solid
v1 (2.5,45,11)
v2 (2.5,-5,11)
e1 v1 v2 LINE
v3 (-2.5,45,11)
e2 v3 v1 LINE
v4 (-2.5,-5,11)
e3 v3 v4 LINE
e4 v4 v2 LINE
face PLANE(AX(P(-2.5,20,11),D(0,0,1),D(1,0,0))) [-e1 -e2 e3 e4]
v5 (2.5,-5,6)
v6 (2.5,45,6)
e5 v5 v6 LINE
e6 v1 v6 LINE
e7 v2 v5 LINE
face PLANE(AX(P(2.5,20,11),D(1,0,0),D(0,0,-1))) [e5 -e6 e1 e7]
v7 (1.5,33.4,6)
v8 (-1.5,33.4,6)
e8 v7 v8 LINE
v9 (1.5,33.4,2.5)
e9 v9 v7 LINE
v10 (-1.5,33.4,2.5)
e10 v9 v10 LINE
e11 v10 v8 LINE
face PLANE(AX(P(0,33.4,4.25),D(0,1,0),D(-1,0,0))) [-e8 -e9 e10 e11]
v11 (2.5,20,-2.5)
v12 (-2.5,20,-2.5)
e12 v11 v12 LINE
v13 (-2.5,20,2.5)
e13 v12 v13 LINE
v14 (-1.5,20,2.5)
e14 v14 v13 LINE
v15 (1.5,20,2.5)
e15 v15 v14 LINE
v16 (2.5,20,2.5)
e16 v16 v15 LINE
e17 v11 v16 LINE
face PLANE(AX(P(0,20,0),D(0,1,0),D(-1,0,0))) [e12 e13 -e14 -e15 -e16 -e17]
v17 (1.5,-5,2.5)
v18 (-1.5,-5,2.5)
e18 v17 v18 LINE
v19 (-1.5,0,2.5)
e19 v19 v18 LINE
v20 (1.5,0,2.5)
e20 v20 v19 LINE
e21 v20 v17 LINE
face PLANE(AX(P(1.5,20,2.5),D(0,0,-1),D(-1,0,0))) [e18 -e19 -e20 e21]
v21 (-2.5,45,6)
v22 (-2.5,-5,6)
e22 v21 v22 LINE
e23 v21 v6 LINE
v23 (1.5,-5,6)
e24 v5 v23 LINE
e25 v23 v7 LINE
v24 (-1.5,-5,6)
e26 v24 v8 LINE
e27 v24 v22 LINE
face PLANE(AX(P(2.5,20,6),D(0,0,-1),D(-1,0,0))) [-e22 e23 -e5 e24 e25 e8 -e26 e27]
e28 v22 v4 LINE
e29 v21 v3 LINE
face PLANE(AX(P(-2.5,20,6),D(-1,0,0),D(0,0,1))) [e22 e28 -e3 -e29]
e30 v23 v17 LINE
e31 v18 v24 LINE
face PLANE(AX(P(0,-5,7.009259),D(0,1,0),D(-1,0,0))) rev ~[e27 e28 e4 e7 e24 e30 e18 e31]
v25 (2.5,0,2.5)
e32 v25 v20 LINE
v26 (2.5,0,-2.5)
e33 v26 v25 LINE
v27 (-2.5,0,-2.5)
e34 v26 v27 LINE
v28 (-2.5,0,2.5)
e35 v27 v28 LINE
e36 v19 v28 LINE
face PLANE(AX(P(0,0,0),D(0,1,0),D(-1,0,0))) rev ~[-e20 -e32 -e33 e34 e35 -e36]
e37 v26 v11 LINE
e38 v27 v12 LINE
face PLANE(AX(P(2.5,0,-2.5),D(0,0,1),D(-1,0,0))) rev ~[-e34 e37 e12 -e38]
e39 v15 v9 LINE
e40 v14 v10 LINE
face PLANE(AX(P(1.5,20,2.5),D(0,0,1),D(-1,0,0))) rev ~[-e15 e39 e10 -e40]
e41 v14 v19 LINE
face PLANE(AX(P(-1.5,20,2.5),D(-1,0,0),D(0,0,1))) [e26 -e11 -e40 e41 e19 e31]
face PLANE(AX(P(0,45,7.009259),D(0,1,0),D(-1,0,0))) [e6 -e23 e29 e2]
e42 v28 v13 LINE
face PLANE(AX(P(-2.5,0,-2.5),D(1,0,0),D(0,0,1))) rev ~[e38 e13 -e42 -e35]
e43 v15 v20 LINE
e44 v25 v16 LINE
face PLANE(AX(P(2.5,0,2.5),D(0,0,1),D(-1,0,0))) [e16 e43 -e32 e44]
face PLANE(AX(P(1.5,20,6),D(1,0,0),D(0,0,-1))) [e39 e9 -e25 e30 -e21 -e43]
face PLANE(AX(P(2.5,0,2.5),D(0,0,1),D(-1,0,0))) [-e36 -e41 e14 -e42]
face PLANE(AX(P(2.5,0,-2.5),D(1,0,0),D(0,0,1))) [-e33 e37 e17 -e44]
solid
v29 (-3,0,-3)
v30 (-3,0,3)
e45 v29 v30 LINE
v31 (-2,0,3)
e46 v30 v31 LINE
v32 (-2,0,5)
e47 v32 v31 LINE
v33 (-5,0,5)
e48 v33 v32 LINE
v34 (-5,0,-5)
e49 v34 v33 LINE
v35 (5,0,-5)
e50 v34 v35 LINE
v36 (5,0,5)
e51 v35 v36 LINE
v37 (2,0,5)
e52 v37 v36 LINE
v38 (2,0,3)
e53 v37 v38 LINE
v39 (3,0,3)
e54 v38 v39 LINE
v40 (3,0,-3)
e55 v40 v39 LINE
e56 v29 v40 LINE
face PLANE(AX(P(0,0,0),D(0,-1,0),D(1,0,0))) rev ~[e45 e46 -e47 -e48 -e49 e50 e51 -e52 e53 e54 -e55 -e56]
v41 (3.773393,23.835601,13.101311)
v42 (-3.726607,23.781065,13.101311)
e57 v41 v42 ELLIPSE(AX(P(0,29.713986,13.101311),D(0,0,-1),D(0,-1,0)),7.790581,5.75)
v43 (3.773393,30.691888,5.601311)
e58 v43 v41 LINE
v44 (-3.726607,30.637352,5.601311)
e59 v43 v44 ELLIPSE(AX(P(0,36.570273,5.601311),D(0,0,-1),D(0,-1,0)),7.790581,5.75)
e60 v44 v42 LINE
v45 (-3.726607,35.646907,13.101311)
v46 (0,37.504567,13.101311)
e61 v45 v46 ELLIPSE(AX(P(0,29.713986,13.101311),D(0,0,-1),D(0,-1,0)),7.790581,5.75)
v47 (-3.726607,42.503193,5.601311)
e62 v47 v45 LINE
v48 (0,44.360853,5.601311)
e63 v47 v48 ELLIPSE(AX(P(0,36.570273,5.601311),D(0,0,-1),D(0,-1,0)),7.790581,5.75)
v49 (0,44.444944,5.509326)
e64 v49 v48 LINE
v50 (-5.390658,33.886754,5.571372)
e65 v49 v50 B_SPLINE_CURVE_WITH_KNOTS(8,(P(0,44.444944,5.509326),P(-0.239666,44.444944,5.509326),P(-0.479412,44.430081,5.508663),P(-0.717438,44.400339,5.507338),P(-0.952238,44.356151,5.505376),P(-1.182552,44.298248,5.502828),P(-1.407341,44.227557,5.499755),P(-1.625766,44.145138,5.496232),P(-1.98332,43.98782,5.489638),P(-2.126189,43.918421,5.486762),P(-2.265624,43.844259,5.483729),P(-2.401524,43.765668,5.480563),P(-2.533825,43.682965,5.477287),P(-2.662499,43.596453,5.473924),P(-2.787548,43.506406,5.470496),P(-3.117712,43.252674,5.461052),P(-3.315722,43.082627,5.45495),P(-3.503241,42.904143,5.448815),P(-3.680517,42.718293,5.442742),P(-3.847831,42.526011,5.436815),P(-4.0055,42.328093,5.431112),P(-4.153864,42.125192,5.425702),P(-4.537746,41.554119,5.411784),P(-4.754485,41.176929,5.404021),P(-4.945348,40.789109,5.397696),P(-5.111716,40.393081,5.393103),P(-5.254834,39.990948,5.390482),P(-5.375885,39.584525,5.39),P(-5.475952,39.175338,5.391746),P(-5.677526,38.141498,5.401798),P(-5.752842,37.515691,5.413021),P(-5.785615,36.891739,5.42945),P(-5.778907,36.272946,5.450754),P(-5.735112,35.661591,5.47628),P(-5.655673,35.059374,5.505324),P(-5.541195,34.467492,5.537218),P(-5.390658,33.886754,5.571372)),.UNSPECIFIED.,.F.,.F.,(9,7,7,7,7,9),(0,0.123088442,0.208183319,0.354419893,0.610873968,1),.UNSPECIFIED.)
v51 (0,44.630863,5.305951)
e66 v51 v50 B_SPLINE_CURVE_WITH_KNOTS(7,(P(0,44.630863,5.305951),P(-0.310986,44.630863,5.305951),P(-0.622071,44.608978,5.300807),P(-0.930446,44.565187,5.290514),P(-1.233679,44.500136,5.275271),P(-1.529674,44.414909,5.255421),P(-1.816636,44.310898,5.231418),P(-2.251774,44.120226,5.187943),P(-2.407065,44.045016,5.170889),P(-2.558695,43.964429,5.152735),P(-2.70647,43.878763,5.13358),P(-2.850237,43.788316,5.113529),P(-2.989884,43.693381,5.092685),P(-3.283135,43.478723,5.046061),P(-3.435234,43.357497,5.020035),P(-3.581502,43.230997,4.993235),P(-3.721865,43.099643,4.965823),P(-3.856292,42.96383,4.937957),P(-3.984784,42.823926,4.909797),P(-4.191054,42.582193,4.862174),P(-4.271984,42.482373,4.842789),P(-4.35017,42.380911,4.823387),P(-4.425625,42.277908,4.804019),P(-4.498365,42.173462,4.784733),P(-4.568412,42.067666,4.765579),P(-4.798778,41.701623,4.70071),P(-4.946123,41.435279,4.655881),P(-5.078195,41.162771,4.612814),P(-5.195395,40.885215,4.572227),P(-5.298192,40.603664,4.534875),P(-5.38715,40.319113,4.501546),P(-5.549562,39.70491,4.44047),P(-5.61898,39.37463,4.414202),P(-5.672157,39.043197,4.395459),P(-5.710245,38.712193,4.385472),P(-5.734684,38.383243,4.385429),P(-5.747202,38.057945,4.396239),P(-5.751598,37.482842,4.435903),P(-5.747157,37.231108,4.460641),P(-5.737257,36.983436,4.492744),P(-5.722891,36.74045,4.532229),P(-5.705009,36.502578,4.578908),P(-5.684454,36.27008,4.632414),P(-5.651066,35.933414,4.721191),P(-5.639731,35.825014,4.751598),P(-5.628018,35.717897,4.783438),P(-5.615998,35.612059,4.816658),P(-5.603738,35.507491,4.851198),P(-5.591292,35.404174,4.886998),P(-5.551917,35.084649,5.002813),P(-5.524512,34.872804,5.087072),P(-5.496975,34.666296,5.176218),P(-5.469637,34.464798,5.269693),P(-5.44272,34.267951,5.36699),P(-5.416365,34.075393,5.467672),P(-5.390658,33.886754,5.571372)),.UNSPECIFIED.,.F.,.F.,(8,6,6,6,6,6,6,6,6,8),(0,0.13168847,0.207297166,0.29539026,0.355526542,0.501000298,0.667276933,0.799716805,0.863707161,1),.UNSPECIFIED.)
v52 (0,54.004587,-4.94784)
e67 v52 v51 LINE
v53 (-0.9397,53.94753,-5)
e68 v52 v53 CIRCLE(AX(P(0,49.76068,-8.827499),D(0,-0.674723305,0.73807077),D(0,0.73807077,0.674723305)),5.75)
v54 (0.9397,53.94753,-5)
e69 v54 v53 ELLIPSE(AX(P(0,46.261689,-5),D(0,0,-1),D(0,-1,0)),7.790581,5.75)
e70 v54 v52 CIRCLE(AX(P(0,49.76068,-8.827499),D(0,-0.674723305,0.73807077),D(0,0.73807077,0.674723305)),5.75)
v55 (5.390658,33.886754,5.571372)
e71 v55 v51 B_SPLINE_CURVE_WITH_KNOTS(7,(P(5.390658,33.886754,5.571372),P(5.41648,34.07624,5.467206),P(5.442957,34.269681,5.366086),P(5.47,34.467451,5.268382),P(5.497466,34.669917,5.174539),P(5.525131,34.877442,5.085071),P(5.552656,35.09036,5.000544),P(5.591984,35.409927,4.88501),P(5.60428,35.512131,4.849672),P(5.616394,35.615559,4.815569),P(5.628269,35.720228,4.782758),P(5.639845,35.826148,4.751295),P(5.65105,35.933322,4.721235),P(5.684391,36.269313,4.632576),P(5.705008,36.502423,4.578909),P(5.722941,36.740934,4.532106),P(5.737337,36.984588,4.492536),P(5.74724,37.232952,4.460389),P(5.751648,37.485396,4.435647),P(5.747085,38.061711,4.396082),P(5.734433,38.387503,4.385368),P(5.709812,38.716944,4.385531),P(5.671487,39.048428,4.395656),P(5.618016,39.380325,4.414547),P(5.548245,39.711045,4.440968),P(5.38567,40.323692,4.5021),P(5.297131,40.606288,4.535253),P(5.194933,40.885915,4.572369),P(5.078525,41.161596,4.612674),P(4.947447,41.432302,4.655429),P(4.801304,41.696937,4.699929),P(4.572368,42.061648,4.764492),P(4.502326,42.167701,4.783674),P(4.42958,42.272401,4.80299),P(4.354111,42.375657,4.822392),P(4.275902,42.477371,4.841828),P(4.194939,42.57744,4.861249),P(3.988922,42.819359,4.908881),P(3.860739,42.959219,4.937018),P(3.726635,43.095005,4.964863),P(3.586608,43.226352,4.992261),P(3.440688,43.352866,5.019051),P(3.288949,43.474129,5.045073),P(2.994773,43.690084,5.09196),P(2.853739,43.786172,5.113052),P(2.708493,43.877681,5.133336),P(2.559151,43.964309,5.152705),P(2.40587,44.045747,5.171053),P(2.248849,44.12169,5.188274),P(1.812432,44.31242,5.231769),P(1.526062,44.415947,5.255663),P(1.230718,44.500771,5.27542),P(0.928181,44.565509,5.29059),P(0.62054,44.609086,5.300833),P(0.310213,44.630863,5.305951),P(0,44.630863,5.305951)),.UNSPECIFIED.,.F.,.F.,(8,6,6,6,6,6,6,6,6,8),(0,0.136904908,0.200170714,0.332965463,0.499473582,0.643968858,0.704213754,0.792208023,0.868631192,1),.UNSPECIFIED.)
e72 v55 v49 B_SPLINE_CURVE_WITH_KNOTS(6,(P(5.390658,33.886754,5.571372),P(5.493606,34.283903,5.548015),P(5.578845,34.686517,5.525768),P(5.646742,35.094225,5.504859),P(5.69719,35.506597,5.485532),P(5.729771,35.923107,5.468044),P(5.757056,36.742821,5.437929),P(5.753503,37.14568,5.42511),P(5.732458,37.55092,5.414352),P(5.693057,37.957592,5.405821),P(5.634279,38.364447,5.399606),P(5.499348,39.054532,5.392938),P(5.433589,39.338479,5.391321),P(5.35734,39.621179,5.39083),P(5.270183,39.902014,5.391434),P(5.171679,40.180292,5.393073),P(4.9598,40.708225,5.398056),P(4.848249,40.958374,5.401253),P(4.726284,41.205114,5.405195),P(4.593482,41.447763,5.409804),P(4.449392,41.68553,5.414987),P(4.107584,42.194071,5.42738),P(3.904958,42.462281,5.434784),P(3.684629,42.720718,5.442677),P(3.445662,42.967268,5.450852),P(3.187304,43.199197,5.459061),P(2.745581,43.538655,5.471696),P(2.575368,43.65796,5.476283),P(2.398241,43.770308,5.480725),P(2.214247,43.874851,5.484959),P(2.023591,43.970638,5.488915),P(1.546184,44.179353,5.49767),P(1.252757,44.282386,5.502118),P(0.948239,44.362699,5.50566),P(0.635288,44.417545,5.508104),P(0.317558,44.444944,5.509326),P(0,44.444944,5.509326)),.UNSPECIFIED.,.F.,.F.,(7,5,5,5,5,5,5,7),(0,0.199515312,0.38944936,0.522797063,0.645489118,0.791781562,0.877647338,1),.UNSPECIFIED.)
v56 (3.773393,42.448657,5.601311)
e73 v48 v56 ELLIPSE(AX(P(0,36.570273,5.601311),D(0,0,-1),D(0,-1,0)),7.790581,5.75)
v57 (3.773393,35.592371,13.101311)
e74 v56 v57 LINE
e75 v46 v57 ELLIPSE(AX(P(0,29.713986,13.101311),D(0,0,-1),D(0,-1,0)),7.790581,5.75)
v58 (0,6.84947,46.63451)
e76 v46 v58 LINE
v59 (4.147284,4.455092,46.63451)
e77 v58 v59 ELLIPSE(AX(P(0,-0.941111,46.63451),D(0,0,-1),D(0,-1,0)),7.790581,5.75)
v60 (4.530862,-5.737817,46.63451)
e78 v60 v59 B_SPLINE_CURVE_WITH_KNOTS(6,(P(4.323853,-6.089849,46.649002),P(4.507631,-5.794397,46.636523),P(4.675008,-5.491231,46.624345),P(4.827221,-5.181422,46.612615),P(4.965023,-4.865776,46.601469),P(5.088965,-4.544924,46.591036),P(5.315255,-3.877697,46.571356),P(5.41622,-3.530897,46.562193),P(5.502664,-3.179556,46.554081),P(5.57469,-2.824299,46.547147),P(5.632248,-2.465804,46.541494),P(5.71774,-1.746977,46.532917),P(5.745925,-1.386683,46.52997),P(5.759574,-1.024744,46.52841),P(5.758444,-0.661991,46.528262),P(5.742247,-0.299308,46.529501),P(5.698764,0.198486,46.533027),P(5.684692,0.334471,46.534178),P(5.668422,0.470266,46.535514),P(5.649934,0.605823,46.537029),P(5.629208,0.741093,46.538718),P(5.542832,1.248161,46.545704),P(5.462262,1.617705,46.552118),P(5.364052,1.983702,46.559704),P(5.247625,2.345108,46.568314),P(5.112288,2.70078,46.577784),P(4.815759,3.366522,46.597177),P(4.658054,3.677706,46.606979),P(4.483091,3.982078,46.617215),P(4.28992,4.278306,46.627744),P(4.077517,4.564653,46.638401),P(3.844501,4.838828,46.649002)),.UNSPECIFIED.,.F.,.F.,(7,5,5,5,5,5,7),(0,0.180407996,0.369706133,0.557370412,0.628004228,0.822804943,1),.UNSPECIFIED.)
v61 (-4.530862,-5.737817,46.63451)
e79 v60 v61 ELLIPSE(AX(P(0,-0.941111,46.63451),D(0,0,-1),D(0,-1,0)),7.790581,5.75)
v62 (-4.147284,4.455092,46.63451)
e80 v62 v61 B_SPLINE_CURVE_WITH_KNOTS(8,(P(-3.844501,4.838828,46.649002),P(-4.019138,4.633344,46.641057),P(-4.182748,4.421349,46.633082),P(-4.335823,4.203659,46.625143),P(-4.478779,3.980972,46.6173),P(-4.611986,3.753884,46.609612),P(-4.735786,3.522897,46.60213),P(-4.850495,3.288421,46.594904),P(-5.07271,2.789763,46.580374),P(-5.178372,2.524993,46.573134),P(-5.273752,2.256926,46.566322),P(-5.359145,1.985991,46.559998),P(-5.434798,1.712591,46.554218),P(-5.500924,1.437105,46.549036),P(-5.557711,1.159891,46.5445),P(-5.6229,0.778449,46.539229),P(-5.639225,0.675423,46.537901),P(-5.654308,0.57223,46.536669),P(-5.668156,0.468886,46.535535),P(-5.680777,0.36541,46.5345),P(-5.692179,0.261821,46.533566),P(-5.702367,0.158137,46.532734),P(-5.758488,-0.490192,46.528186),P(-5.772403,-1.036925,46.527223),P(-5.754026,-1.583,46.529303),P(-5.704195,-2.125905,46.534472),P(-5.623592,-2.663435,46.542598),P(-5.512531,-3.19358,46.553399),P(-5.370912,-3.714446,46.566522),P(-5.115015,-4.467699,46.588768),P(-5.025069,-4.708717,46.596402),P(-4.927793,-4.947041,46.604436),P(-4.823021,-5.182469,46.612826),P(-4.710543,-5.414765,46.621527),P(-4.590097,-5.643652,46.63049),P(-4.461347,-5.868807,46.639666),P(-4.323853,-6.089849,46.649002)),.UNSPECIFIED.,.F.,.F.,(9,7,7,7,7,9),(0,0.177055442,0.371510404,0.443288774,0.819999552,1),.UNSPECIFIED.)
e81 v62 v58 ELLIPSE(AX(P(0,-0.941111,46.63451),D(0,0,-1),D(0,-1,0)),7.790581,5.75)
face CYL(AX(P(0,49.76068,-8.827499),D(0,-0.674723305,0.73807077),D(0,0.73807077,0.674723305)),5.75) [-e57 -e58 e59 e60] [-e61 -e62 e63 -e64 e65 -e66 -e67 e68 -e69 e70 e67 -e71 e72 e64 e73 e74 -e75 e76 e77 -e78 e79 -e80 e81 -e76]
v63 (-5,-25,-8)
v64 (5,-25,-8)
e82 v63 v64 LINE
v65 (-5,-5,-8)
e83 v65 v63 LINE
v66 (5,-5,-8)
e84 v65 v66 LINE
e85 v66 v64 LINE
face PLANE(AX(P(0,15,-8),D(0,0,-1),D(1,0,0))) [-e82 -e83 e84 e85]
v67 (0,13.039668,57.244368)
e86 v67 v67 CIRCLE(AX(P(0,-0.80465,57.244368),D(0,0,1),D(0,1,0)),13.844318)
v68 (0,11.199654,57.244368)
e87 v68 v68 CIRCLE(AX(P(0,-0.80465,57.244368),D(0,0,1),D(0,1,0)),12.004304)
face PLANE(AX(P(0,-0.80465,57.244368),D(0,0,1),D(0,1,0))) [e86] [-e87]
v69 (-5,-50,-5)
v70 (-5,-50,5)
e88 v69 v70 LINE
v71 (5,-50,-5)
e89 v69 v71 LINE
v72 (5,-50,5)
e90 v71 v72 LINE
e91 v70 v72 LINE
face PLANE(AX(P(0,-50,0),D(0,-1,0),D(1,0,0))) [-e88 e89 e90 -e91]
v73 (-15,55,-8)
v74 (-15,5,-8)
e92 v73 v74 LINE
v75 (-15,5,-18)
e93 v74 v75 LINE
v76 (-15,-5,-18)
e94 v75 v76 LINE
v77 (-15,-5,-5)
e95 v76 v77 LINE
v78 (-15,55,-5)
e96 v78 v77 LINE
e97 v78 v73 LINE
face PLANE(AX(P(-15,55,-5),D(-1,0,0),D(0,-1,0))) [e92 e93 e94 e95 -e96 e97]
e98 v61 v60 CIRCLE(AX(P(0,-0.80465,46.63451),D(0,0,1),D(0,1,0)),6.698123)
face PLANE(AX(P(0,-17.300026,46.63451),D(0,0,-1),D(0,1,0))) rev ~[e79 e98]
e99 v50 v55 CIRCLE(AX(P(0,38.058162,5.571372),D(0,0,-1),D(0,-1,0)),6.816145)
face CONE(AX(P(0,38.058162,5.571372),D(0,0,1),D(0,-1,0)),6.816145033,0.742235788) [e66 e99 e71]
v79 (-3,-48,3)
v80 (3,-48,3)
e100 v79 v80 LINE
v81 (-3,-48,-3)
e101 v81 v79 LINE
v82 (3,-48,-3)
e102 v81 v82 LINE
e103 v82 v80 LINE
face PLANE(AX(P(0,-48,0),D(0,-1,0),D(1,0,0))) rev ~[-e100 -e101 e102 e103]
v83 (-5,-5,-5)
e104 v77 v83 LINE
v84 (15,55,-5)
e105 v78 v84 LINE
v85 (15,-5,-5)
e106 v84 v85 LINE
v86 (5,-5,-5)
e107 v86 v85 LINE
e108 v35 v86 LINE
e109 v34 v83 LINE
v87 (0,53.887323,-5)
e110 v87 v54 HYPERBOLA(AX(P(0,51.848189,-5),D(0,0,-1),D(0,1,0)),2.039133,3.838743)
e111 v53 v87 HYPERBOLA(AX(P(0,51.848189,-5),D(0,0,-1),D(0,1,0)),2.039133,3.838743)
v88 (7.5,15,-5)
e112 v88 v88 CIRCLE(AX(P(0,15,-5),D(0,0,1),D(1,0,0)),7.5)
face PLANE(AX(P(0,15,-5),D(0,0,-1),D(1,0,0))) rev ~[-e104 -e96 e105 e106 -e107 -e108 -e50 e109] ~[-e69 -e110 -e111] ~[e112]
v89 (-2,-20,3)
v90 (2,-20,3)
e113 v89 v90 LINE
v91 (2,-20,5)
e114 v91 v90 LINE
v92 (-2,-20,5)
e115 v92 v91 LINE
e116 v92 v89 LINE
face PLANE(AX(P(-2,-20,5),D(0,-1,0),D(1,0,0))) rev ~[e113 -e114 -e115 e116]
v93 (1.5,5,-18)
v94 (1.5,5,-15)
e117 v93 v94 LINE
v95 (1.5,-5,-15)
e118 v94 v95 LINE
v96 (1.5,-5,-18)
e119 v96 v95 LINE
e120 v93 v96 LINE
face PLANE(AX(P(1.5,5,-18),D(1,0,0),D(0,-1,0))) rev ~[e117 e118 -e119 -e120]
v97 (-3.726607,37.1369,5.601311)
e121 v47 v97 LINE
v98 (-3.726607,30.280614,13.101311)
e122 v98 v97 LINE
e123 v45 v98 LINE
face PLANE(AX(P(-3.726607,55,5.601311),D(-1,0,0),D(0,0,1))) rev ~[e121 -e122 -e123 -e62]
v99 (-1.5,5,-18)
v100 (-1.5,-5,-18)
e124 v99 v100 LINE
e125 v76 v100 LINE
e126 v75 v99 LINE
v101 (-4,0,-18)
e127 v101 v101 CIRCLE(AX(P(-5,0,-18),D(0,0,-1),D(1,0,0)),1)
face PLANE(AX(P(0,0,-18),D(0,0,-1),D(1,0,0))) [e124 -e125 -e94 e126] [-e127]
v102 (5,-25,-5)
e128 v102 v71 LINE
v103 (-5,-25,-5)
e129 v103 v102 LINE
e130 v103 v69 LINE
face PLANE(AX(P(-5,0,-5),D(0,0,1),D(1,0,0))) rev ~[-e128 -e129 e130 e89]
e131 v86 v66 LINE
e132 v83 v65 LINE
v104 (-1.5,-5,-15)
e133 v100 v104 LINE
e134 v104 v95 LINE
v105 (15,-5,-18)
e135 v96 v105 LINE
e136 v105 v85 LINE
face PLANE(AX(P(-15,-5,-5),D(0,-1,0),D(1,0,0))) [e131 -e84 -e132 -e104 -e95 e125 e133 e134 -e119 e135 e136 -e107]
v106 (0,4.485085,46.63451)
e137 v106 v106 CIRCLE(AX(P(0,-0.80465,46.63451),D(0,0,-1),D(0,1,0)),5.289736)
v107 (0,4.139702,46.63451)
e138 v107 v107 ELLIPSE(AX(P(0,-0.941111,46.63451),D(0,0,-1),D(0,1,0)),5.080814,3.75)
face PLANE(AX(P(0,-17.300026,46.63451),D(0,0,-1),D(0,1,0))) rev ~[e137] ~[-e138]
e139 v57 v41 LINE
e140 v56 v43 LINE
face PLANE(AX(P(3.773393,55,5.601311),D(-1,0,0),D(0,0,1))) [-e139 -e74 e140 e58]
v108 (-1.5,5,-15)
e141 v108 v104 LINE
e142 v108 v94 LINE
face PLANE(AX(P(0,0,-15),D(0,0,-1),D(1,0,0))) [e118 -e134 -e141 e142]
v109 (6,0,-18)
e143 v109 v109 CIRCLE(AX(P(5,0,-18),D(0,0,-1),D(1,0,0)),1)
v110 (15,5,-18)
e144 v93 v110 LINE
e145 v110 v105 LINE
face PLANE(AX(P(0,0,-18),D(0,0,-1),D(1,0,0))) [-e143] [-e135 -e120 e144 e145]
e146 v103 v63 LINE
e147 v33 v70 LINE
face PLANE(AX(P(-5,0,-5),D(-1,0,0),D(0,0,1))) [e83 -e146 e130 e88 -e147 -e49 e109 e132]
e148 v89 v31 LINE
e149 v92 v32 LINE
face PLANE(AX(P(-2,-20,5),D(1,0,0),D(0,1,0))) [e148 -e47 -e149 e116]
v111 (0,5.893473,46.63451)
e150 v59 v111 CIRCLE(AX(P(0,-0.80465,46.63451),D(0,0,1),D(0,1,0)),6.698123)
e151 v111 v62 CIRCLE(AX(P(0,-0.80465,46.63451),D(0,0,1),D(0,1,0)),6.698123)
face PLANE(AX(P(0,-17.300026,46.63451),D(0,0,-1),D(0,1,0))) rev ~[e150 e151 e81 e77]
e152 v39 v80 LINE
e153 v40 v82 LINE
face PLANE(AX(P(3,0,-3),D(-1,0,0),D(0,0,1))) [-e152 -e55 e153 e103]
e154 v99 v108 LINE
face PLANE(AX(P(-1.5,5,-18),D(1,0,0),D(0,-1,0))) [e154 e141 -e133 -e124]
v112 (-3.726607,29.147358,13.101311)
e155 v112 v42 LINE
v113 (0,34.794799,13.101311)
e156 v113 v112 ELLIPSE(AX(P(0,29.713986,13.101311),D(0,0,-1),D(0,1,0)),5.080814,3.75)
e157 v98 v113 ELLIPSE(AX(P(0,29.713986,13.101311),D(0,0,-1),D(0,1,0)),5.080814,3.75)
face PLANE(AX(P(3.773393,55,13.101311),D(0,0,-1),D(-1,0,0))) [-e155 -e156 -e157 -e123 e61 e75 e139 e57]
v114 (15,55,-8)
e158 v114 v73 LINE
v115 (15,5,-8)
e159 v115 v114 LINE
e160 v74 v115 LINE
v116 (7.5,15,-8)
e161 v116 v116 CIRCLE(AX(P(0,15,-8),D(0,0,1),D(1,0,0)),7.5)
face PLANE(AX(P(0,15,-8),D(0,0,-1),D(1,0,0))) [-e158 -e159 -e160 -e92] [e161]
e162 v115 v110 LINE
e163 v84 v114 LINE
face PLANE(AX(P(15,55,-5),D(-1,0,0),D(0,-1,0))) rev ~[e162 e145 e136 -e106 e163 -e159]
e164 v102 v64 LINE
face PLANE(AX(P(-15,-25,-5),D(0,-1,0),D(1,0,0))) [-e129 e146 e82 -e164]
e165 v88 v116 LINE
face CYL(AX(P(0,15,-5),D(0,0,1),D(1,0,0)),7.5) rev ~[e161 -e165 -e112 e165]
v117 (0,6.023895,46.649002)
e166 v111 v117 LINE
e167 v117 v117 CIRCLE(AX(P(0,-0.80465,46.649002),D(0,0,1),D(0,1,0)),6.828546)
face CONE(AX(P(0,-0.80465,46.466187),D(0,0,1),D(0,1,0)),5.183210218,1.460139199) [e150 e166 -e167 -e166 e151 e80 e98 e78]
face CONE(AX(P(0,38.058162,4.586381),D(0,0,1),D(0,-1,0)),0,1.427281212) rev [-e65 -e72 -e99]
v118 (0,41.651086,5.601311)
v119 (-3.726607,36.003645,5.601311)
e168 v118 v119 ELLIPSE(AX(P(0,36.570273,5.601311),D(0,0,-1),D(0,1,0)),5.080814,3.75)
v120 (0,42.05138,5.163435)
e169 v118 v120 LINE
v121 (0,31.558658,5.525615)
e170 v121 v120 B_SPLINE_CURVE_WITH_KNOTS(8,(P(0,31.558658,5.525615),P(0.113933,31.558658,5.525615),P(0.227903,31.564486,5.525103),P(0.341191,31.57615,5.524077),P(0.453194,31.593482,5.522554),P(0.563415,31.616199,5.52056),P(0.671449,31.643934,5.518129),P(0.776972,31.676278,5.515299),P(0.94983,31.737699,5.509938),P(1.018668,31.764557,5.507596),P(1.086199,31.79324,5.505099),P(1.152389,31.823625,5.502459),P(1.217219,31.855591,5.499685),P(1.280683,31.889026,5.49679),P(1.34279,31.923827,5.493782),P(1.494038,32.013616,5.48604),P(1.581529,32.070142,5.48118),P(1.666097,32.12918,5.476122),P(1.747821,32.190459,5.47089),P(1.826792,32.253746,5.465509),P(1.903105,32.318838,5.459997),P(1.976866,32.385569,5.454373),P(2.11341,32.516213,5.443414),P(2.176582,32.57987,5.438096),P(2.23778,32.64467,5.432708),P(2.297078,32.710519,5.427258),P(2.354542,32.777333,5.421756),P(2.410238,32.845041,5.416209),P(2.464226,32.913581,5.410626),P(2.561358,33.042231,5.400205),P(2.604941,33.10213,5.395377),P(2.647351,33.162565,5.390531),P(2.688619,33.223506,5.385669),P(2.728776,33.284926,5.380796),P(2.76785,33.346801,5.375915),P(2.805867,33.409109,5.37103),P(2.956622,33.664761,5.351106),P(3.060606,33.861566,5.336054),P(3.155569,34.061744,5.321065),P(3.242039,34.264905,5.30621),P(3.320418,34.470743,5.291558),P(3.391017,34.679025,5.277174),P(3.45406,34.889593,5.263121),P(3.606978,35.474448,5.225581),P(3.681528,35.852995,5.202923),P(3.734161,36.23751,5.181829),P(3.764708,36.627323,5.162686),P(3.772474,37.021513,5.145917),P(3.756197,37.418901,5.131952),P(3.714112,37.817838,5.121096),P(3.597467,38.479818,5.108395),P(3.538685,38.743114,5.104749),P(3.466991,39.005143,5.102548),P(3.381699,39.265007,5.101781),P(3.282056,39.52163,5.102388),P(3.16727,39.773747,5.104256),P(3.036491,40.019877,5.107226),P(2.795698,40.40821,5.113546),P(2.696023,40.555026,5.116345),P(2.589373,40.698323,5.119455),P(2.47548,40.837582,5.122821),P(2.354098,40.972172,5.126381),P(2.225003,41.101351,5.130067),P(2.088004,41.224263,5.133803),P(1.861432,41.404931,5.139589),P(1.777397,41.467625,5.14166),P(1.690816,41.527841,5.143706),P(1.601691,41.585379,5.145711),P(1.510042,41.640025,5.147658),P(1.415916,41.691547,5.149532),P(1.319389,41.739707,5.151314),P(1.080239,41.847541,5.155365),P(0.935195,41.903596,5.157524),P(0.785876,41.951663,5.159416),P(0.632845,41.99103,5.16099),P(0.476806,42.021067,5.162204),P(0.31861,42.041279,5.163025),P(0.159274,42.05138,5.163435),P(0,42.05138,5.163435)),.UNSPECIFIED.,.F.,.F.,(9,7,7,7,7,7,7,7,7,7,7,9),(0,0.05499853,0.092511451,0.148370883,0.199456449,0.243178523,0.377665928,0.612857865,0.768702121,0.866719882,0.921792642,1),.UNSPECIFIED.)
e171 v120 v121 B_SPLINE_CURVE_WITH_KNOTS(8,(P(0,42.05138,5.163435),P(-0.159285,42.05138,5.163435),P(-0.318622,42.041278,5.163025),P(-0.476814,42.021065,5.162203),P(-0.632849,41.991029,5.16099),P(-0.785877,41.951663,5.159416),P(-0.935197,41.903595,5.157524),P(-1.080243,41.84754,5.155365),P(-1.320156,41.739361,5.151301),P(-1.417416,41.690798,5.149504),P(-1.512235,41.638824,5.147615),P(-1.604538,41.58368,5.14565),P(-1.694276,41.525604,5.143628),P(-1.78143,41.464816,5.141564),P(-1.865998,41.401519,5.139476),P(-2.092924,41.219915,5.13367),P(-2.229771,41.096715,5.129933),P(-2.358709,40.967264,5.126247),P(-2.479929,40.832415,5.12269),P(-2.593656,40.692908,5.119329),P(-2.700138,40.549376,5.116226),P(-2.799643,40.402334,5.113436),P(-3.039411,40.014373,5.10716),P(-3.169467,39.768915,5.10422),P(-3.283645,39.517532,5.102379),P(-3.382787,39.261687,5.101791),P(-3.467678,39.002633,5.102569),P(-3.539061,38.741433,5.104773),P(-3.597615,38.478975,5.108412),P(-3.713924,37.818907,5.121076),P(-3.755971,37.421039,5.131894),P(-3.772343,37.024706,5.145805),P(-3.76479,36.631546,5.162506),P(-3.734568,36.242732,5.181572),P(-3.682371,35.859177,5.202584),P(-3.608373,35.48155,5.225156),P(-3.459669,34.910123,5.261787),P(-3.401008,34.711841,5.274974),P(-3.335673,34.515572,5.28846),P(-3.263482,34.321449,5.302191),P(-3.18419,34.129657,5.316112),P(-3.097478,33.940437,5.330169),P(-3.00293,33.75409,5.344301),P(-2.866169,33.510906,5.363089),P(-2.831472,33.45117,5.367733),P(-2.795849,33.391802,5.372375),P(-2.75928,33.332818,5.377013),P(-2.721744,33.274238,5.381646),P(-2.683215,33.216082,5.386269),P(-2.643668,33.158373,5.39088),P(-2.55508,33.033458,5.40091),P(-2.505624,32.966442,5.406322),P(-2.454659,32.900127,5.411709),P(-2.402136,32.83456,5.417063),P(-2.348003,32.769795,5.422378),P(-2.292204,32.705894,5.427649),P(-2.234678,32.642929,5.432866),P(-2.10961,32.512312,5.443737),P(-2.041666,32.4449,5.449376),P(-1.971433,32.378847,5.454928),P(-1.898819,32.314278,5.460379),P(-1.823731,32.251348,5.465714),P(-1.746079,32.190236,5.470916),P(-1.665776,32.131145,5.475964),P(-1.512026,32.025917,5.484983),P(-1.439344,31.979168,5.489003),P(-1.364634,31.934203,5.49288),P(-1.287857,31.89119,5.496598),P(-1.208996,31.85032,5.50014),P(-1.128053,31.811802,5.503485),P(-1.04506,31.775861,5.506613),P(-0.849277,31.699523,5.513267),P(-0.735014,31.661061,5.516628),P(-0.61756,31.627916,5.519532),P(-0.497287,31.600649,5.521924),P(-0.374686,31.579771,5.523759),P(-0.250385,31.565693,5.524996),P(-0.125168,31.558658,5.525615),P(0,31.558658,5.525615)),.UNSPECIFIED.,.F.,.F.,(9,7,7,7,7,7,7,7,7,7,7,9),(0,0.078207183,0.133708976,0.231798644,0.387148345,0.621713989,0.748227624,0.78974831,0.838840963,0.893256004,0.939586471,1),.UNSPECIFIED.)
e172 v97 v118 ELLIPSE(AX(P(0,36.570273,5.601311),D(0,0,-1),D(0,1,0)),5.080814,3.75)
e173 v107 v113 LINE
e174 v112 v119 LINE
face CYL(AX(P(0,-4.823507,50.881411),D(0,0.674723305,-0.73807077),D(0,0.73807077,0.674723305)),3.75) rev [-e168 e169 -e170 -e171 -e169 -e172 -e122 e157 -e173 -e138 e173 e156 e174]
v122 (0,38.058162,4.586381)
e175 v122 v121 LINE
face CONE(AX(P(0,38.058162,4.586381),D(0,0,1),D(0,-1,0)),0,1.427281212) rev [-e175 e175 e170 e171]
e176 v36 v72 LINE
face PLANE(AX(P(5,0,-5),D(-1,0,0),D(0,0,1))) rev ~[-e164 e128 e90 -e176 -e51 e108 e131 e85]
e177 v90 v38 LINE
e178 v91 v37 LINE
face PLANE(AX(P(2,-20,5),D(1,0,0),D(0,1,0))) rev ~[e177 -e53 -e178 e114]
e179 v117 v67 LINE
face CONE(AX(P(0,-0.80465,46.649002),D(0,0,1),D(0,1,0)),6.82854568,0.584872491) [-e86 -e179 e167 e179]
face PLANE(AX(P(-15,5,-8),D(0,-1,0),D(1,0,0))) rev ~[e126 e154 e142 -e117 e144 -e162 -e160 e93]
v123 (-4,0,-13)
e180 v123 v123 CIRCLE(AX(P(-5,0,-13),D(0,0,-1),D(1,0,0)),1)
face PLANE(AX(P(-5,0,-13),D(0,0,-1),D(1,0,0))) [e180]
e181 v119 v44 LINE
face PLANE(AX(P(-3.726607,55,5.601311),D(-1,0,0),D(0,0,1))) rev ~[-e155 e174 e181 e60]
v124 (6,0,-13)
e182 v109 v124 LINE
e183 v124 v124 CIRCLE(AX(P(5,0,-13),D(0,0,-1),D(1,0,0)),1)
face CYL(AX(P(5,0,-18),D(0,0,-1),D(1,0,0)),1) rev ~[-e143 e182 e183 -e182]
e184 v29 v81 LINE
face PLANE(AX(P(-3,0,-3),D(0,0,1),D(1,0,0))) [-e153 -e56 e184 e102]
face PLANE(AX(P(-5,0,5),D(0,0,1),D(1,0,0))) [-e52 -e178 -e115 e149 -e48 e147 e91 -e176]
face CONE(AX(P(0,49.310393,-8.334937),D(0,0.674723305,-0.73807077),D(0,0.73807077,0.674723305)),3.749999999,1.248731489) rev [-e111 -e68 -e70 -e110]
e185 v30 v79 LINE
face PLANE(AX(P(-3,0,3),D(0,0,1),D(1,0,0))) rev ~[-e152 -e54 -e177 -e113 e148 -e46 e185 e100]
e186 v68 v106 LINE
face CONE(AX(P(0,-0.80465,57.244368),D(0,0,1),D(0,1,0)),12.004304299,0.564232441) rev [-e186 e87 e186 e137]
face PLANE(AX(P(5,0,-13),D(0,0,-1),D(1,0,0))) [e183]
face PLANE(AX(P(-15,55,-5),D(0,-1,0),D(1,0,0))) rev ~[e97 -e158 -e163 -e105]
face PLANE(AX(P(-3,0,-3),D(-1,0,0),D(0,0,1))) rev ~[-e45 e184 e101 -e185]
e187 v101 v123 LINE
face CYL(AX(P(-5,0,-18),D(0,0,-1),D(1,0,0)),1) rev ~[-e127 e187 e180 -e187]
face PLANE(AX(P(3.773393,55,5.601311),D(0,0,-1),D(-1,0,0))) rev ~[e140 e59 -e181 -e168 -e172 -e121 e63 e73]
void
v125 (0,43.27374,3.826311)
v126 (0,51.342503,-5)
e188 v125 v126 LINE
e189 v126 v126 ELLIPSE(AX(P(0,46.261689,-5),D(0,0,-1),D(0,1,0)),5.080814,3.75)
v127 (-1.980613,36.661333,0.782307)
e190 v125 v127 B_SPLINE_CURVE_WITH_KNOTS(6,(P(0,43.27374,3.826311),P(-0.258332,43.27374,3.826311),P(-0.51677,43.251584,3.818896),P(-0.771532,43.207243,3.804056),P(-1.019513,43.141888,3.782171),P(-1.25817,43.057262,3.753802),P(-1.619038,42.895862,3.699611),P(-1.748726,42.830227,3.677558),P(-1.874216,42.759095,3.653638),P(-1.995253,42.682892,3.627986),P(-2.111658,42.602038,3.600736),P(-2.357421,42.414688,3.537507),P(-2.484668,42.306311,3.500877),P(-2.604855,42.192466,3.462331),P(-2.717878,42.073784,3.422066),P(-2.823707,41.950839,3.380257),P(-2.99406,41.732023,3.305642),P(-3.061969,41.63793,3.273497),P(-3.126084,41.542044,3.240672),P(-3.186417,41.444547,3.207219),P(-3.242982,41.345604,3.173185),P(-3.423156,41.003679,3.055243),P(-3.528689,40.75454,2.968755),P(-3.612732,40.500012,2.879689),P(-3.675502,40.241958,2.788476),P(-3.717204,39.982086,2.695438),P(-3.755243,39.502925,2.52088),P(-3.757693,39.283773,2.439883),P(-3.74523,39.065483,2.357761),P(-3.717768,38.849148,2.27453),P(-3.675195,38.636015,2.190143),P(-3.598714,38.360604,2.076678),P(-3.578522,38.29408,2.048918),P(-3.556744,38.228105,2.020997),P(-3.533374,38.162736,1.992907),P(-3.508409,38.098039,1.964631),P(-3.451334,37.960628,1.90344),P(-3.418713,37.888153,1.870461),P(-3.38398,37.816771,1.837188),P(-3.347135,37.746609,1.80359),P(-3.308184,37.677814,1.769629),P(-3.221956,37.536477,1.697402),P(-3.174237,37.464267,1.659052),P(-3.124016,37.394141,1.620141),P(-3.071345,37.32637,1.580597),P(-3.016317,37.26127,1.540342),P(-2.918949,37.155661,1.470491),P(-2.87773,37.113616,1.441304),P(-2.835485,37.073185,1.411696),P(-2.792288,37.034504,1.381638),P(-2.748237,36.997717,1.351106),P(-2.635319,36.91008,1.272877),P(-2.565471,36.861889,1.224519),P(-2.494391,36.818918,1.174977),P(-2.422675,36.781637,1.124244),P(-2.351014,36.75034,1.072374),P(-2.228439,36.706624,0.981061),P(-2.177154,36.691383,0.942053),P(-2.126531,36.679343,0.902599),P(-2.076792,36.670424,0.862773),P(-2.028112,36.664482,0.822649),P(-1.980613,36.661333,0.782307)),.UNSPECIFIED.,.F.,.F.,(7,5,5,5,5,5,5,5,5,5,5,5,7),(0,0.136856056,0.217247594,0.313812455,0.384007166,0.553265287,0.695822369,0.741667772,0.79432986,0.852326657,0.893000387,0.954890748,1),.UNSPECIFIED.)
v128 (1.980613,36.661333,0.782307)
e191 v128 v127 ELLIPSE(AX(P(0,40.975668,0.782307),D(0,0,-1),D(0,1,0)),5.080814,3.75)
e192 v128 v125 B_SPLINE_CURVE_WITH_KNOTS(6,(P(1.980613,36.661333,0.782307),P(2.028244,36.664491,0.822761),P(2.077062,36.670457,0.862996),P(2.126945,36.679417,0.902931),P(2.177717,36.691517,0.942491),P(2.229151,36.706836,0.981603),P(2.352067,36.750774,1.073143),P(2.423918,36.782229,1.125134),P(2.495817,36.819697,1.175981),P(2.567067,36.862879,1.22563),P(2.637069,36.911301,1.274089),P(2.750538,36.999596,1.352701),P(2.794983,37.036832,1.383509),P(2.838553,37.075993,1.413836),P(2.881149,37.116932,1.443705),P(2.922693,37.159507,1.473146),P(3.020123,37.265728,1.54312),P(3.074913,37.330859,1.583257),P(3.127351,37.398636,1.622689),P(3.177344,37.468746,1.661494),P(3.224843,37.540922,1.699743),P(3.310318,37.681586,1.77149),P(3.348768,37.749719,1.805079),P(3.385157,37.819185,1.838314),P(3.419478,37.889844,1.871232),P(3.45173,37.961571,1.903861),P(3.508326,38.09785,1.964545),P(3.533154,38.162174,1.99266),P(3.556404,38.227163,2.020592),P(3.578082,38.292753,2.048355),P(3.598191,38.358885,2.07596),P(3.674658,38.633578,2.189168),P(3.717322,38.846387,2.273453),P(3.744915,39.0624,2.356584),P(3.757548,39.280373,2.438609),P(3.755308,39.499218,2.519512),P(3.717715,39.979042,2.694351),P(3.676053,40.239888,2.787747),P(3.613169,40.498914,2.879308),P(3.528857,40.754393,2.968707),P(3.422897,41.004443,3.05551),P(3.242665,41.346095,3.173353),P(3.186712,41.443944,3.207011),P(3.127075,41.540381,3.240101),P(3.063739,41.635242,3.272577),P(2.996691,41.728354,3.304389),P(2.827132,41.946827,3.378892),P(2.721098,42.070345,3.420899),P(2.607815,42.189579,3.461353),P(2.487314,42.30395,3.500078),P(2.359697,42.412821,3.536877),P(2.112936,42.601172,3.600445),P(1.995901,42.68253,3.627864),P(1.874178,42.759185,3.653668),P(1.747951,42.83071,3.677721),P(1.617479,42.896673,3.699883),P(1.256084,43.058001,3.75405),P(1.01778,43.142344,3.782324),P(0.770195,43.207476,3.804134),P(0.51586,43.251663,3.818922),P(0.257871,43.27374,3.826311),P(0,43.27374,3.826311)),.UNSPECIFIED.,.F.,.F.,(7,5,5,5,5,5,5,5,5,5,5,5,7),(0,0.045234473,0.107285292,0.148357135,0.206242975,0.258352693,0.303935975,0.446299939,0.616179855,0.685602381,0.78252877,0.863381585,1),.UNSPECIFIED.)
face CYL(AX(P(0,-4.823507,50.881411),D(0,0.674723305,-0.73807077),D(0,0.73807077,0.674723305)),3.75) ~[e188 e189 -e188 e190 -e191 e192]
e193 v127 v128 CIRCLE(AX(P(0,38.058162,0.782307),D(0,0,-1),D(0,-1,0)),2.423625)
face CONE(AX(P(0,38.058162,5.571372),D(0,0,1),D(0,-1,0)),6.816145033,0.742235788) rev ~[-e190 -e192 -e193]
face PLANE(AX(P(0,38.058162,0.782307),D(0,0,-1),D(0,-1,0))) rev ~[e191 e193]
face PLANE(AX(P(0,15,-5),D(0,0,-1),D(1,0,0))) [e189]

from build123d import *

# Parameters (mm, degrees)
F0_W          = 10
F0_H          = 10
F0_W_2        = 6
F0_H_2        = 6
F1_DEPTH      = 50
F2_W          = 4
F2_H          = 20
F3_DEPTH      = 3
F4_W          = 5
F4_H          = 5
F5_DEPTH      = 20
F7_DEPTH      = 25
F7_DEPTH_BACK = 25
F8_W          = 30
F8_H          = 80
F9_DEPTH      = 3
F10_R         = 7.5
F11_DEPTH     = 3.001
F12_W         = 30
F12_H         = 10
F13_DEPTH     = 10
F14_W         = 3
F14_H         = 10
F15_DEPTH     = 3
F16_R         = 1
F17_DEPTH     = 5
F18_W         = 6
F18_H         = 6
F19_DEPTH     = 2
F20_W         = 10
F20_H         = 20
F21_DEPTH     = 25
F25_W         = 7.5
F25_H         = 7.5
F26_DEPTH     = 33.5
F27_W         = 3
F27_H         = 3.5
F28_DEPTH     = 11.6
F29_W         = 34.4351846725
F29_H         = 17.5250470638
F30_DEPTH     = 605
F33_W         = 16.5032114089
F33_H         = 5.4589001536
F34_DEPTH     = 25


with BuildPart() as f1:
    # F0 (on Front) → F1 (new body)
    with BuildSketch(Plane.XZ):
        Rectangle(F0_W, F0_H)
        Rectangle(F0_W_2, F0_H_2, mode=Mode.SUBTRACT)
    extrude(amount=F1_DEPTH)

    # F2 (on face) → F3 (cut)
    with BuildSketch(Plane.XY.offset(5)):
        with Locations((0, -10)):
            Rectangle(F2_W, F2_H)
    extrude(amount=-F3_DEPTH, mode=Mode.SUBTRACT)

    # F8 (on face) → F9 (join)
    with BuildSketch(Plane(origin=(0, 0, -5), x_dir=(1, 0, 0), z_dir=(0, 0, -1))):
        with Locations((0, -15)):
            Rectangle(F8_W, F8_H)
    extrude(amount=F9_DEPTH)

    # F10 (on face) → F11 (cut, through all)
    with BuildSketch(Plane.XY.offset(-5)):
        with Locations((0, 15)):
            Circle(F10_R)
    extrude(amount=-F11_DEPTH, mode=Mode.SUBTRACT)

    # F12 (on face) → F13 (join)
    with BuildSketch(Plane(origin=(0, 0, -8), x_dir=(1, 0, 0), z_dir=(0, 0, -1))):
        Rectangle(F12_W, F12_H)
    extrude(amount=F13_DEPTH)

    # F14 (on face) → F15 (cut)
    with BuildSketch(Plane(origin=(0, 0, -18), x_dir=(1, 0, 0), z_dir=(0, 0, -1))):
        Rectangle(F14_W, F14_H)
    extrude(amount=-F15_DEPTH, mode=Mode.SUBTRACT)

    # F16 (on face) → F17 (cut)
    with BuildSketch(Plane(origin=(0, 0, -18), x_dir=(1, 0, 0), z_dir=(0, 0, -1))):
        with Locations((-5, 0)):
            Circle(F16_R)
        with Locations((5, 0)):
            Circle(F16_R)
    extrude(amount=-F17_DEPTH, mode=Mode.SUBTRACT)

    # F18 (on face) → F19 (join)
    with BuildSketch(Plane.XZ.offset(50)):
        Rectangle(F18_W, F18_H)
    extrude(amount=-F19_DEPTH)

    # F20 (on face) → F21 (cut)
    with BuildSketch(Plane.XY.offset(-5)):
        with Locations((-10, -15)):
            Rectangle(F20_W, F20_H)
        with Locations((10, -15)):
            Rectangle(F20_W, F20_H)
    extrude(amount=-F21_DEPTH, mode=Mode.SUBTRACT)

    # F22 (on Right) → F23 (revolve)
    with BuildSketch(Plane.YZ):
        Polygon((-2.0557420257, 53.4116236296), (52.0781588757, -5.8047241393), (54.0045872331, -4.9478402361), (-0.5796004863, 54.7610702405), align=None)
    revolve(axis=Axis((0, 22.938336782, 20.5131024087), (0, -0.6747233055, 0.7380707697)))

    # F25 (on offset) → F26 (cut)
    with BuildSketch(Plane(origin=(0, 55, 0), x_dir=(-1, 0, 0), z_dir=(0, 1, 0))):
        with Locations((-0.0233930768, 9.3513107755)):
            Rectangle(F25_W, F25_H)
    extrude(amount=-F26_DEPTH, mode=Mode.SUBTRACT)

    # F29 (on Right) → F30 (cut, symmetric)
    with BuildSketch(Plane.YZ):
        with Locations((-0.082434155, 55.3970336914)):
            Rectangle(F29_W, F29_H)
    extrude(amount=F30_DEPTH, both=True, mode=Mode.SUBTRACT)

    # F31 (on Right) → F32 (revolve)
    with BuildSketch(Plane.YZ):
        Polygon((11.19965408, 57.2443678975), (4.3785599992, 46.4661866426), (6.0238954611, 46.6490015388), (13.0396680906, 57.2443678975), align=None)
    revolve(axis=Axis((0, -0.8046502189, 52.2255096585), (0, 0, 1)))

    # F33 (on face) → F34 (cut)
    with BuildSketch(Plane.YZ.offset(15)):
        with Locations((46.7483942956, -10.7294500768)):
            Rectangle(F33_W, F33_H)
    extrude(amount=-F34_DEPTH, mode=Mode.SUBTRACT)

    # F35 (on Right) → F36 (revolve)
    with BuildSketch(Plane.YZ):
        Polygon((31.2420167029, 5.5713723414), (35.6345362961, 0.7823074702), (38.0581617355, 0.7823074702), (38.0581617355, 4.5863807123), align=None)
    revolve(axis=Axis((0, 38.0581617355, 2.6843440912), (0, 0, -1)))


with BuildPart() as f5:
    # F4 (on face) → F5 (new body)
    with BuildSketch(Plane(origin=(0, 0, 0), x_dir=(-1, 0, 0), z_dir=(0, 1, 0))):
        Rectangle(F4_W, F4_H)
    extrude(amount=F5_DEPTH)

    # F6 (on face) → F7 (join, two sides)
    with BuildSketch(Plane(origin=(0, 20, 0), x_dir=(-1, 0, 0), z_dir=(0, 1, 0))) as f7_sk:
        Polygon((-2.5, 11), (-2.5, 6), (-1.5, 6), (-1.5, 2.5), (1.5, 2.5), (1.5, 6), (2.5, 6), (2.5, 11), align=None)
    extrude(amount=F7_DEPTH)
    extrude(f7_sk.sketch, amount=-F7_DEPTH_BACK)

    # F27 (on face) → F28 (cut)
    with BuildSketch(Plane(origin=(0, 45, 0), x_dir=(-1, 0, 0), z_dir=(0, 1, 0))):
        with Locations((0, 4.25)):
            Rectangle(F27_W, F27_H)
    extrude(amount=-F28_DEPTH, mode=Mode.SUBTRACT)


solid = Compound([f1.part, f5.part])
